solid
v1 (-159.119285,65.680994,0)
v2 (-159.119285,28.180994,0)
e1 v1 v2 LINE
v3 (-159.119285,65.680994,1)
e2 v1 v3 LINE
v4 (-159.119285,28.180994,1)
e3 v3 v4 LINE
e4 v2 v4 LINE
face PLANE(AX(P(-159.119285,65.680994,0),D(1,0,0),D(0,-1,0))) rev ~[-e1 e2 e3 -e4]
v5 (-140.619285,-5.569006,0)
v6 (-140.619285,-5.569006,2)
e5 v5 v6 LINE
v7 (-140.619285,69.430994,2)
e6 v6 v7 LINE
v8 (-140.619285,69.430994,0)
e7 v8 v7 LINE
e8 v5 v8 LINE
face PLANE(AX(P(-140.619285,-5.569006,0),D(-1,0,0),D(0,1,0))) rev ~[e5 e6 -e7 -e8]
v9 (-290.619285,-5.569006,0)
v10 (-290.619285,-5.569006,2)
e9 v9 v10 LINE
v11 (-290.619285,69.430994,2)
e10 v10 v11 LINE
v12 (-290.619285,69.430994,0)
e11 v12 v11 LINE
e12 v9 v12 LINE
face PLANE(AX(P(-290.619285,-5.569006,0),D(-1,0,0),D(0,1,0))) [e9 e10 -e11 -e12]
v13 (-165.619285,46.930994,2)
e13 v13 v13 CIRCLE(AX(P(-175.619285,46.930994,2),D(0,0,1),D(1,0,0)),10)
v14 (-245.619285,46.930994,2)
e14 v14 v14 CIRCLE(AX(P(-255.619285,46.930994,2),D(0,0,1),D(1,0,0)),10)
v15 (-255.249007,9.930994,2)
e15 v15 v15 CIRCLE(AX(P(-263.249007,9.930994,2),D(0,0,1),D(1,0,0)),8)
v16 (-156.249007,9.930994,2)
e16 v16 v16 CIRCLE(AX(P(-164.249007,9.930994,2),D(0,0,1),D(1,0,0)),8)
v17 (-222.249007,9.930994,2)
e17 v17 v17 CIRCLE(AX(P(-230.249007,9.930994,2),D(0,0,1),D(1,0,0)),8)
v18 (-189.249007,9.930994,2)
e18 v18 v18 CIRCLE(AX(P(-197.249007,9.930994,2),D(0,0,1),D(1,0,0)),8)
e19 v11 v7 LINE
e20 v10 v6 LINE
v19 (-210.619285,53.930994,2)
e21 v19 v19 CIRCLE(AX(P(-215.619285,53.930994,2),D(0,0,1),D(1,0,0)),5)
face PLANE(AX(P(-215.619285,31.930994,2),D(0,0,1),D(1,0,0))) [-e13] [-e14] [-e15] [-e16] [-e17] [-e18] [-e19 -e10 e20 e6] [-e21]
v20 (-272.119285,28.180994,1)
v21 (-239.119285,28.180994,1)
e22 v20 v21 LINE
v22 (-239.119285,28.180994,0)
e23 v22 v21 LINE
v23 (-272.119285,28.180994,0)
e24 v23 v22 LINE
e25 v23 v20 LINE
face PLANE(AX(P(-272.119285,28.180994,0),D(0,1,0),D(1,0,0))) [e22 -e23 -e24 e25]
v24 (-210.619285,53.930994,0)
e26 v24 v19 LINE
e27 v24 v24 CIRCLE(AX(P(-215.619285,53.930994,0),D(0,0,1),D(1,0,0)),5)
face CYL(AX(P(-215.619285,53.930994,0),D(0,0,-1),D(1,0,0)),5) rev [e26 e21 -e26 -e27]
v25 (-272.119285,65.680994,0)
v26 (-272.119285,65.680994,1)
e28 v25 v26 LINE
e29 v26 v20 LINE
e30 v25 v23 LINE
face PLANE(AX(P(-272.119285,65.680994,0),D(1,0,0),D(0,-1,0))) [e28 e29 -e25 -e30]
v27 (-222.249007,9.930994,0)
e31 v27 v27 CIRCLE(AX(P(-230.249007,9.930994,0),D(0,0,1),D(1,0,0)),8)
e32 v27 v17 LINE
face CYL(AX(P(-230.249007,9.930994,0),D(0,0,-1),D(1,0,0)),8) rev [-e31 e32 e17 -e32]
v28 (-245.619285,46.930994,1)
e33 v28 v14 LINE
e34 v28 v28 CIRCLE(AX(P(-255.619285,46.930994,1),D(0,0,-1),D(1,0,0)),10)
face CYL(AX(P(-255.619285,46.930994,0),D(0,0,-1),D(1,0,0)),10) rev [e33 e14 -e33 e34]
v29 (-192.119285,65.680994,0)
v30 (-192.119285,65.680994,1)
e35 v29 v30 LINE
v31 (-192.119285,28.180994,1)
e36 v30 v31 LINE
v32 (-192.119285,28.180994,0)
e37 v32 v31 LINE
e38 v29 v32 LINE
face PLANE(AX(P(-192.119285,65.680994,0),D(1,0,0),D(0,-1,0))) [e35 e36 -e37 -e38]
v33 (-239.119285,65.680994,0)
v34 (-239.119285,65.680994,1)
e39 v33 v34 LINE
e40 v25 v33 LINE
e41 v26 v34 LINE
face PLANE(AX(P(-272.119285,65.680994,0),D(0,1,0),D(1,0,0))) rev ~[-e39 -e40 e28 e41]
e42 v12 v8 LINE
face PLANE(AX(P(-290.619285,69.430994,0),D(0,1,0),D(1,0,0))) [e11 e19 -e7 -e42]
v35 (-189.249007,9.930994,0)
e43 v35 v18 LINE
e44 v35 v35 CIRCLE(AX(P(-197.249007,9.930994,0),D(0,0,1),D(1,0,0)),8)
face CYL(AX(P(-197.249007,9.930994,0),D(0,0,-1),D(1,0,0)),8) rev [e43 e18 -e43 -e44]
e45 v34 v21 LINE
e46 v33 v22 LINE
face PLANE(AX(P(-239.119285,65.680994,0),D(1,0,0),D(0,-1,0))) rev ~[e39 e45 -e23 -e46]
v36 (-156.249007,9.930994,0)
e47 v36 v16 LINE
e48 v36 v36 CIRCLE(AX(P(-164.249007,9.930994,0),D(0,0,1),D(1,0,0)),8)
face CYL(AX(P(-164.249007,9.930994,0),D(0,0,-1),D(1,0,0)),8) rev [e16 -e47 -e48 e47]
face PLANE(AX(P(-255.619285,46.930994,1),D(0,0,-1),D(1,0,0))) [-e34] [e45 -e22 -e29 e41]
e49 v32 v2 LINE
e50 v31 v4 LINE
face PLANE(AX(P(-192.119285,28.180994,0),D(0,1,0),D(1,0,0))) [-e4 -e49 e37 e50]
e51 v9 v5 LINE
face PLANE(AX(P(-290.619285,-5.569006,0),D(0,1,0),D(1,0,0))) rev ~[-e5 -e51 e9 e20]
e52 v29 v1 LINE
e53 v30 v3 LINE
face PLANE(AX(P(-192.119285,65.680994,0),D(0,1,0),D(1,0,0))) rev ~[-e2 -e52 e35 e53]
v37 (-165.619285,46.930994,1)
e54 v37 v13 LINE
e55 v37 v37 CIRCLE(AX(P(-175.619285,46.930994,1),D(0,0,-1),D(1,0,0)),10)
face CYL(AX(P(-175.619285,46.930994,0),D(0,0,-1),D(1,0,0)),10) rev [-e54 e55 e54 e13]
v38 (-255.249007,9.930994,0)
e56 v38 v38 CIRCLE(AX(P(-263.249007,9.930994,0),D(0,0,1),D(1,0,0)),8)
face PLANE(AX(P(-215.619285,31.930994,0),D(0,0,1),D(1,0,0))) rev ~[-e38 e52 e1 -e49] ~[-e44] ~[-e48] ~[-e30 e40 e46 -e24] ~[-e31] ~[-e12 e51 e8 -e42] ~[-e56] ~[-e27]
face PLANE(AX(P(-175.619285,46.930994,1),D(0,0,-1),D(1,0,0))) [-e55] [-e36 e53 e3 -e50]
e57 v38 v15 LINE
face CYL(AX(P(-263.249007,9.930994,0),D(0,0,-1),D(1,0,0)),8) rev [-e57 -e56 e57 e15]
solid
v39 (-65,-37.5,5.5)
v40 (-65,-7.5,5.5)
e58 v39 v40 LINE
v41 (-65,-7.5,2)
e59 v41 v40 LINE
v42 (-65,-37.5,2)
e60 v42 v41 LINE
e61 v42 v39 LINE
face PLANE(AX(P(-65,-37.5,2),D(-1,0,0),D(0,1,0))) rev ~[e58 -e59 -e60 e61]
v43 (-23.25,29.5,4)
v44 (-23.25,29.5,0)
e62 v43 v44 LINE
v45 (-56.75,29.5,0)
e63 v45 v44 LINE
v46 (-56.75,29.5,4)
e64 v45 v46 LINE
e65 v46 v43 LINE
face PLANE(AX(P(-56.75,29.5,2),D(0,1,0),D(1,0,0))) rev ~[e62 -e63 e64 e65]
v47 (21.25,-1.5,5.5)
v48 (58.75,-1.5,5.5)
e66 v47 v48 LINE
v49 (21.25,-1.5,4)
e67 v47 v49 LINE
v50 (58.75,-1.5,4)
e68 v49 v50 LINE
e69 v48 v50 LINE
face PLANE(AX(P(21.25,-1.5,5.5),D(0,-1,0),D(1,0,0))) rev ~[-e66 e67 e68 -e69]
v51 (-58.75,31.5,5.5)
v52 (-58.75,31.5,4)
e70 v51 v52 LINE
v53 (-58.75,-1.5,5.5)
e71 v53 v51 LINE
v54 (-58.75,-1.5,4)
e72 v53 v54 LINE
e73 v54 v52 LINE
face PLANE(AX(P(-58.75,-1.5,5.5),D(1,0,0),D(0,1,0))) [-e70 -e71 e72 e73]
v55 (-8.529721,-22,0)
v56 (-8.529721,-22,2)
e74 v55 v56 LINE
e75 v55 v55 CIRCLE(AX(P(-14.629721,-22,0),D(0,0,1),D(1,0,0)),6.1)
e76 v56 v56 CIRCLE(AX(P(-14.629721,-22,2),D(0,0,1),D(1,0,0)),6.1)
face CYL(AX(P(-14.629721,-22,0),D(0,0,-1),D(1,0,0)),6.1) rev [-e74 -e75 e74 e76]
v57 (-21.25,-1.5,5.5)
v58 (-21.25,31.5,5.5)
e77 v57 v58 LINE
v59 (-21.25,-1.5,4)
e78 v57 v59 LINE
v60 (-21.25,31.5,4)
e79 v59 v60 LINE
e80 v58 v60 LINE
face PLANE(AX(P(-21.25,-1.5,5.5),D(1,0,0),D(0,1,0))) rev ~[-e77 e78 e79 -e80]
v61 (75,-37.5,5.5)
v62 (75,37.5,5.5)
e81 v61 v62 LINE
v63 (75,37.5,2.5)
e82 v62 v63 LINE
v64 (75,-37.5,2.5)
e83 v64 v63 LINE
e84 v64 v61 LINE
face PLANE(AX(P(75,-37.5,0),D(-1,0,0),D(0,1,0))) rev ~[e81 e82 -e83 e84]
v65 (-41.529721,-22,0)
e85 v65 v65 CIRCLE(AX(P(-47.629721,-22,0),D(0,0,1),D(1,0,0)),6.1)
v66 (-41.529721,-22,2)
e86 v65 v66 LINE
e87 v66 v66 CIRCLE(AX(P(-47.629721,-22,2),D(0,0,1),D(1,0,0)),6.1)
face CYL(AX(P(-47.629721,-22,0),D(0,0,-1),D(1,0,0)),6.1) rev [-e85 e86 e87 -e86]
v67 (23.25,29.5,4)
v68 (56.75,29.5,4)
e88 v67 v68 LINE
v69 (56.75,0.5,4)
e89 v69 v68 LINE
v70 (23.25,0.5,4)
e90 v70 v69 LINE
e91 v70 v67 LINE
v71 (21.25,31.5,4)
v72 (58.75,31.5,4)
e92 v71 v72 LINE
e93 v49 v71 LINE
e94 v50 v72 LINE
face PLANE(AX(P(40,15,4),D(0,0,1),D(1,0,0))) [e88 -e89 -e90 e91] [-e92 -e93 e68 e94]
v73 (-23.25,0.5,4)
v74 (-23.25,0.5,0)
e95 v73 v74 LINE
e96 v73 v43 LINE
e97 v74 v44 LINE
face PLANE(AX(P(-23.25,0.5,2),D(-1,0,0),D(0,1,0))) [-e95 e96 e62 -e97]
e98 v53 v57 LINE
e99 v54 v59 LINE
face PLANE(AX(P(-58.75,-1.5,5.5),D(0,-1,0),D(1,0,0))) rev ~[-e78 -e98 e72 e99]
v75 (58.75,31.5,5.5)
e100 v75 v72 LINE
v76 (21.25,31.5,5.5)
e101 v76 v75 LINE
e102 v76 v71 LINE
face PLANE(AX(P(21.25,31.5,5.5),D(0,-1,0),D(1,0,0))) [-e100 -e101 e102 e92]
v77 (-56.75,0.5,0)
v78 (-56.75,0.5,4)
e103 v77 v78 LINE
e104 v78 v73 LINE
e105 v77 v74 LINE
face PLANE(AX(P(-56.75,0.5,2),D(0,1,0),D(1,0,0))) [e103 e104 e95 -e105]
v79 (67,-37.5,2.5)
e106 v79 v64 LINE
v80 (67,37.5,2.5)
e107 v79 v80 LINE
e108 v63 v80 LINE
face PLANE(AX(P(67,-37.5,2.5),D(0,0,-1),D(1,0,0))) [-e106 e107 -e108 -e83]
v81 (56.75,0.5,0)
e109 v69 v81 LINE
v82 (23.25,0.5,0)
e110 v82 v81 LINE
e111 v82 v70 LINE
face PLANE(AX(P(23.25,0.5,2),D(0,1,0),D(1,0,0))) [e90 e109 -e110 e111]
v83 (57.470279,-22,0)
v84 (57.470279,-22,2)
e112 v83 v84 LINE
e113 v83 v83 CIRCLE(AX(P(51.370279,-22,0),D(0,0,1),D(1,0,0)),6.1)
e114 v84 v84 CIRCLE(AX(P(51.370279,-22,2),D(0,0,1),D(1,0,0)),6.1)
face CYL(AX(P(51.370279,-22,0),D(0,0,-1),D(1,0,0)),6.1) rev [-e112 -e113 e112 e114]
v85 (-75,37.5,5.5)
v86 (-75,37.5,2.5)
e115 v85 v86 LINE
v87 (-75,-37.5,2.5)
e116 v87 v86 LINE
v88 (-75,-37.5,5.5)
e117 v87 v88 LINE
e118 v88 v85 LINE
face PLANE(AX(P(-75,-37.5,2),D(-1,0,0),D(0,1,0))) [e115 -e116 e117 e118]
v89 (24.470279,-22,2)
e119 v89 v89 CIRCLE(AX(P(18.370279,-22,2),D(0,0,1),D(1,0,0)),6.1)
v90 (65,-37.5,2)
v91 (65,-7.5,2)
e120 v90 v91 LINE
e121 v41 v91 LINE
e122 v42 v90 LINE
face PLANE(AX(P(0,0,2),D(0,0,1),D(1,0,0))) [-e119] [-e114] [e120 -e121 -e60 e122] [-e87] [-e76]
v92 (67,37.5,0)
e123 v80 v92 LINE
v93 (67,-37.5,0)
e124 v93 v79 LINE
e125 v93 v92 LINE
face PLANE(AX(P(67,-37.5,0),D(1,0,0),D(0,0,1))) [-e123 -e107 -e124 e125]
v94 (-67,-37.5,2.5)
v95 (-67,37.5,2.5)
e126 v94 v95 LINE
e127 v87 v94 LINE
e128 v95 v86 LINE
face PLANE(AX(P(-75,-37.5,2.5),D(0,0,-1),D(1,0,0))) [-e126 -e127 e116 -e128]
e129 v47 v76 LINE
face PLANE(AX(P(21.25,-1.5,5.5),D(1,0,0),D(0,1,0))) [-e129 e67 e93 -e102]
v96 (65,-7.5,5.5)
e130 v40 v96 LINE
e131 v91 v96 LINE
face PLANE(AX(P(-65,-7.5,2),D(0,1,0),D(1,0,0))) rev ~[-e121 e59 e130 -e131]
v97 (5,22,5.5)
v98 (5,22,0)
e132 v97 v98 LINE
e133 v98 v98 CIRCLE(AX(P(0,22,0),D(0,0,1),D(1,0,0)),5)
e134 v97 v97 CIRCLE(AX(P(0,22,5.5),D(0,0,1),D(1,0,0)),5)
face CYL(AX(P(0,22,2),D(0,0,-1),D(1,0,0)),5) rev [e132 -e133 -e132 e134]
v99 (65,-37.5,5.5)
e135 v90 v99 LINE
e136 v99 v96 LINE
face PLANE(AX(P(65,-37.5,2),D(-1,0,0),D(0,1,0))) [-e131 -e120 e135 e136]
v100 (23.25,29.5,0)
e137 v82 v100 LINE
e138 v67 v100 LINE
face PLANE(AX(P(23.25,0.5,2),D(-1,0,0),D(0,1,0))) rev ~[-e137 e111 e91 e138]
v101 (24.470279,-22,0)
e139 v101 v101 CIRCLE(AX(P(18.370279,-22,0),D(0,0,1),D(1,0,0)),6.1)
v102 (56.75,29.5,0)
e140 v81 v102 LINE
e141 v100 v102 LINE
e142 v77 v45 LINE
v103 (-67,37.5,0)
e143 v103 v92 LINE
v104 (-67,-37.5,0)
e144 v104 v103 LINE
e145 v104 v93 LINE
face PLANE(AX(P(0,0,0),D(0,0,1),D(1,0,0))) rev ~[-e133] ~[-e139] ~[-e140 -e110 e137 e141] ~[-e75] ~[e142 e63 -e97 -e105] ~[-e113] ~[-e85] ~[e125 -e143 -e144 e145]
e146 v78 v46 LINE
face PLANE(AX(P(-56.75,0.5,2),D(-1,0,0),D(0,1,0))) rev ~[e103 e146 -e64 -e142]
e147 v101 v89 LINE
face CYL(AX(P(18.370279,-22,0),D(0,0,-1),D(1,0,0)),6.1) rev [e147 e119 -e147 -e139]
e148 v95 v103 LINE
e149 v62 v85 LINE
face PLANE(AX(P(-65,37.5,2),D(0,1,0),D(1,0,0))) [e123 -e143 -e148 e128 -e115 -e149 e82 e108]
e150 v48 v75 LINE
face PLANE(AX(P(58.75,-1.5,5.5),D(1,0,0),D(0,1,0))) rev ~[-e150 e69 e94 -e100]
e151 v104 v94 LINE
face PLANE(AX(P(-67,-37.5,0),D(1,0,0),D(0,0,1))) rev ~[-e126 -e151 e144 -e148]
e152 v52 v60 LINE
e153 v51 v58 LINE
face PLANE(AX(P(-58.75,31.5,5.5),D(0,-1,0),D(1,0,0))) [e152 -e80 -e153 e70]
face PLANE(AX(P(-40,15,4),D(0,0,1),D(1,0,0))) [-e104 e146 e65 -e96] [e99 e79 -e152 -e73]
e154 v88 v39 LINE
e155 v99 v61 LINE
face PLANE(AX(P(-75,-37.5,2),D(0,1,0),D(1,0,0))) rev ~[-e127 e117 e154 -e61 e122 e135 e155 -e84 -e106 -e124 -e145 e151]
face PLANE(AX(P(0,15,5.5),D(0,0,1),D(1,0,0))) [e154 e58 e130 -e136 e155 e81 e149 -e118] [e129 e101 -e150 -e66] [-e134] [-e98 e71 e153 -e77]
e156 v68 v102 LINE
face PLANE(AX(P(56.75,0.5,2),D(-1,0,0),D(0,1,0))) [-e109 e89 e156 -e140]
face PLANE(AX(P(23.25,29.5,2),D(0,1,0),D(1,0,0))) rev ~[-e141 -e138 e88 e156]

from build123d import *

# Parameters (mm, degrees)
F0_W      = 150
F0_H      = 75
F0_R      = 1.5
F0_R_2    = 6.1
F0_W_2    = 33.5
F0_H_2    = 29
F0_R_3    = 5
F1_DEPTH  = 2
F2_W      = 10
F2_H      = 75
F3_DEPTH  = 3.5
F4_W      = 8
F4_H      = 2.5
F5_DEPTH  = 80
F6_W      = 130
F6_H      = 45
F6_W_2    = 33.5
F6_H_2    = 29
F6_R      = 5
F7_DEPTH  = 3.5
F8_W      = 37.5
F8_H      = 33
F8_W_2    = 33.5
F8_H_2    = 29
F9_DEPTH  = 1.5
F10_W     = 150
F10_H     = 75
F10_R     = 8
F10_R_2   = 10
F10_R_3   = 5
F11_DEPTH = 2
F12_W     = 33
F12_H     = 37.5
F13_DEPTH = 1


# Not quite as in the source:
# - a feature names something its author has since deleted; it is built from what else it names


with BuildPart() as f1:
    # F0 (on Top) → F1 (new body)
    with BuildSketch(Plane.XY):
        Rectangle(F0_W, F0_H)
        with Locations((-70, -25)):
            Circle(F0_R, mode=Mode.SUBTRACT)
        with Locations((-47.6297214627, -22)):
            Circle(F0_R_2, mode=Mode.SUBTRACT)
        with Locations((-14.6297214627, -22)):
            Circle(F0_R_2, mode=Mode.SUBTRACT)
        with Locations((18.3702785373, -22)):
            Circle(F0_R_2, mode=Mode.SUBTRACT)
        with Locations((51.3702785373, -22)):
            Circle(F0_R_2, mode=Mode.SUBTRACT)
        with Locations((70, -25)):
            Circle(F0_R, mode=Mode.SUBTRACT)
        with Locations((-40, 15)):
            Rectangle(F0_W_2, F0_H_2, mode=Mode.SUBTRACT)
        with Locations((-70, 25)):
            Circle(F0_R, mode=Mode.SUBTRACT)
        with Locations((40, 15)):
            Rectangle(F0_W_2, F0_H_2, mode=Mode.SUBTRACT)
        with Locations((0, 22)):
            Circle(F0_R_3, mode=Mode.SUBTRACT)
        with Locations((70, 25)):
            Circle(F0_R, mode=Mode.SUBTRACT)
    extrude(amount=F1_DEPTH)

    # F2 (on face) → F3 (join)
    with BuildSketch(Plane.XY.offset(2)):
        with Locations((-70, 0)):
            Rectangle(F2_W, F2_H)
        with Locations((70, 0)):
            Rectangle(F2_W, F2_H)
    extrude(amount=F3_DEPTH)

    # F4 (on face) → F5 (cut)
    with BuildSketch(Plane.XZ.offset(37.5)):
        with Locations((-71, 1.25)):
            Rectangle(F4_W, F4_H)
        with Locations((71, 1.25)):
            Rectangle(F4_W, F4_H)
    extrude(amount=-F5_DEPTH, mode=Mode.SUBTRACT)

    # F6 (on face) → F7 (join)
    with BuildSketch(Plane.XY.offset(2)):
        with Locations((0, 15)):
            Rectangle(F6_W, F6_H)
        with Locations((-40, 15)):
            Rectangle(F6_W_2, F6_H_2, mode=Mode.SUBTRACT)
        with Locations((0, 22)):
            Circle(F6_R, mode=Mode.SUBTRACT)
        with Locations((40, 15)):
            Rectangle(F6_W_2, F6_H_2, mode=Mode.SUBTRACT)
    extrude(amount=F7_DEPTH)

    # F8 (on face) → F9 (cut)
    with BuildSketch(Plane.XY.offset(5.5)):
        with Locations((-40, 15)):
            Rectangle(F8_W, F8_H)
        with Locations((-40, 15)):
            Rectangle(F8_W_2, F8_H_2, mode=Mode.SUBTRACT)
        with Locations((40, 15)):
            Rectangle(F8_W, F8_H)
        with Locations((40, 15)):
            Rectangle(F8_W_2, F8_H_2, mode=Mode.SUBTRACT)
    extrude(amount=-F9_DEPTH, mode=Mode.SUBTRACT)


with BuildPart() as f11:
    # F10 (on Top) → F11 (new body)
    with BuildSketch(Plane.XY):
        with Locations((-215.6192851201, 31.9309936473)):
            Rectangle(F10_W, F10_H)
        with Locations((-263.2490065828, 9.9309936473)):
            Circle(F10_R, mode=Mode.SUBTRACT)
        with Locations((-230.2490065828, 9.9309936473)):
            Circle(F10_R, mode=Mode.SUBTRACT)
        with Locations((-197.2490065828, 9.9309936473)):
            Circle(F10_R, mode=Mode.SUBTRACT)
        with Locations((-164.2490065828, 9.9309936473)):
            Circle(F10_R, mode=Mode.SUBTRACT)
        with Locations((-255.6192851201, 46.9309936473)):
            Circle(F10_R_2, mode=Mode.SUBTRACT)
        with Locations((-175.6192851201, 46.9309936473)):
            Circle(F10_R_2, mode=Mode.SUBTRACT)
        with Locations((-215.6192851201, 53.9309936473)):
            Circle(F10_R_3, mode=Mode.SUBTRACT)
    extrude(amount=F11_DEPTH)

    # F12 (on face) → F13 (cut)
    with BuildSketch(Plane(origin=(0, 0, 0), x_dir=(1, 0, 0), z_dir=(0, 0, -1))):
        with Locations((-255.6192851201, -46.9309936473)):
            Rectangle(F12_W, F12_H)
        with Locations((-175.6192851201, -46.9309936473)):
            Rectangle(F12_W, F12_H)
    extrude(amount=-F13_DEPTH, mode=Mode.SUBTRACT)


solid = Compound([f1.part, f11.part])
